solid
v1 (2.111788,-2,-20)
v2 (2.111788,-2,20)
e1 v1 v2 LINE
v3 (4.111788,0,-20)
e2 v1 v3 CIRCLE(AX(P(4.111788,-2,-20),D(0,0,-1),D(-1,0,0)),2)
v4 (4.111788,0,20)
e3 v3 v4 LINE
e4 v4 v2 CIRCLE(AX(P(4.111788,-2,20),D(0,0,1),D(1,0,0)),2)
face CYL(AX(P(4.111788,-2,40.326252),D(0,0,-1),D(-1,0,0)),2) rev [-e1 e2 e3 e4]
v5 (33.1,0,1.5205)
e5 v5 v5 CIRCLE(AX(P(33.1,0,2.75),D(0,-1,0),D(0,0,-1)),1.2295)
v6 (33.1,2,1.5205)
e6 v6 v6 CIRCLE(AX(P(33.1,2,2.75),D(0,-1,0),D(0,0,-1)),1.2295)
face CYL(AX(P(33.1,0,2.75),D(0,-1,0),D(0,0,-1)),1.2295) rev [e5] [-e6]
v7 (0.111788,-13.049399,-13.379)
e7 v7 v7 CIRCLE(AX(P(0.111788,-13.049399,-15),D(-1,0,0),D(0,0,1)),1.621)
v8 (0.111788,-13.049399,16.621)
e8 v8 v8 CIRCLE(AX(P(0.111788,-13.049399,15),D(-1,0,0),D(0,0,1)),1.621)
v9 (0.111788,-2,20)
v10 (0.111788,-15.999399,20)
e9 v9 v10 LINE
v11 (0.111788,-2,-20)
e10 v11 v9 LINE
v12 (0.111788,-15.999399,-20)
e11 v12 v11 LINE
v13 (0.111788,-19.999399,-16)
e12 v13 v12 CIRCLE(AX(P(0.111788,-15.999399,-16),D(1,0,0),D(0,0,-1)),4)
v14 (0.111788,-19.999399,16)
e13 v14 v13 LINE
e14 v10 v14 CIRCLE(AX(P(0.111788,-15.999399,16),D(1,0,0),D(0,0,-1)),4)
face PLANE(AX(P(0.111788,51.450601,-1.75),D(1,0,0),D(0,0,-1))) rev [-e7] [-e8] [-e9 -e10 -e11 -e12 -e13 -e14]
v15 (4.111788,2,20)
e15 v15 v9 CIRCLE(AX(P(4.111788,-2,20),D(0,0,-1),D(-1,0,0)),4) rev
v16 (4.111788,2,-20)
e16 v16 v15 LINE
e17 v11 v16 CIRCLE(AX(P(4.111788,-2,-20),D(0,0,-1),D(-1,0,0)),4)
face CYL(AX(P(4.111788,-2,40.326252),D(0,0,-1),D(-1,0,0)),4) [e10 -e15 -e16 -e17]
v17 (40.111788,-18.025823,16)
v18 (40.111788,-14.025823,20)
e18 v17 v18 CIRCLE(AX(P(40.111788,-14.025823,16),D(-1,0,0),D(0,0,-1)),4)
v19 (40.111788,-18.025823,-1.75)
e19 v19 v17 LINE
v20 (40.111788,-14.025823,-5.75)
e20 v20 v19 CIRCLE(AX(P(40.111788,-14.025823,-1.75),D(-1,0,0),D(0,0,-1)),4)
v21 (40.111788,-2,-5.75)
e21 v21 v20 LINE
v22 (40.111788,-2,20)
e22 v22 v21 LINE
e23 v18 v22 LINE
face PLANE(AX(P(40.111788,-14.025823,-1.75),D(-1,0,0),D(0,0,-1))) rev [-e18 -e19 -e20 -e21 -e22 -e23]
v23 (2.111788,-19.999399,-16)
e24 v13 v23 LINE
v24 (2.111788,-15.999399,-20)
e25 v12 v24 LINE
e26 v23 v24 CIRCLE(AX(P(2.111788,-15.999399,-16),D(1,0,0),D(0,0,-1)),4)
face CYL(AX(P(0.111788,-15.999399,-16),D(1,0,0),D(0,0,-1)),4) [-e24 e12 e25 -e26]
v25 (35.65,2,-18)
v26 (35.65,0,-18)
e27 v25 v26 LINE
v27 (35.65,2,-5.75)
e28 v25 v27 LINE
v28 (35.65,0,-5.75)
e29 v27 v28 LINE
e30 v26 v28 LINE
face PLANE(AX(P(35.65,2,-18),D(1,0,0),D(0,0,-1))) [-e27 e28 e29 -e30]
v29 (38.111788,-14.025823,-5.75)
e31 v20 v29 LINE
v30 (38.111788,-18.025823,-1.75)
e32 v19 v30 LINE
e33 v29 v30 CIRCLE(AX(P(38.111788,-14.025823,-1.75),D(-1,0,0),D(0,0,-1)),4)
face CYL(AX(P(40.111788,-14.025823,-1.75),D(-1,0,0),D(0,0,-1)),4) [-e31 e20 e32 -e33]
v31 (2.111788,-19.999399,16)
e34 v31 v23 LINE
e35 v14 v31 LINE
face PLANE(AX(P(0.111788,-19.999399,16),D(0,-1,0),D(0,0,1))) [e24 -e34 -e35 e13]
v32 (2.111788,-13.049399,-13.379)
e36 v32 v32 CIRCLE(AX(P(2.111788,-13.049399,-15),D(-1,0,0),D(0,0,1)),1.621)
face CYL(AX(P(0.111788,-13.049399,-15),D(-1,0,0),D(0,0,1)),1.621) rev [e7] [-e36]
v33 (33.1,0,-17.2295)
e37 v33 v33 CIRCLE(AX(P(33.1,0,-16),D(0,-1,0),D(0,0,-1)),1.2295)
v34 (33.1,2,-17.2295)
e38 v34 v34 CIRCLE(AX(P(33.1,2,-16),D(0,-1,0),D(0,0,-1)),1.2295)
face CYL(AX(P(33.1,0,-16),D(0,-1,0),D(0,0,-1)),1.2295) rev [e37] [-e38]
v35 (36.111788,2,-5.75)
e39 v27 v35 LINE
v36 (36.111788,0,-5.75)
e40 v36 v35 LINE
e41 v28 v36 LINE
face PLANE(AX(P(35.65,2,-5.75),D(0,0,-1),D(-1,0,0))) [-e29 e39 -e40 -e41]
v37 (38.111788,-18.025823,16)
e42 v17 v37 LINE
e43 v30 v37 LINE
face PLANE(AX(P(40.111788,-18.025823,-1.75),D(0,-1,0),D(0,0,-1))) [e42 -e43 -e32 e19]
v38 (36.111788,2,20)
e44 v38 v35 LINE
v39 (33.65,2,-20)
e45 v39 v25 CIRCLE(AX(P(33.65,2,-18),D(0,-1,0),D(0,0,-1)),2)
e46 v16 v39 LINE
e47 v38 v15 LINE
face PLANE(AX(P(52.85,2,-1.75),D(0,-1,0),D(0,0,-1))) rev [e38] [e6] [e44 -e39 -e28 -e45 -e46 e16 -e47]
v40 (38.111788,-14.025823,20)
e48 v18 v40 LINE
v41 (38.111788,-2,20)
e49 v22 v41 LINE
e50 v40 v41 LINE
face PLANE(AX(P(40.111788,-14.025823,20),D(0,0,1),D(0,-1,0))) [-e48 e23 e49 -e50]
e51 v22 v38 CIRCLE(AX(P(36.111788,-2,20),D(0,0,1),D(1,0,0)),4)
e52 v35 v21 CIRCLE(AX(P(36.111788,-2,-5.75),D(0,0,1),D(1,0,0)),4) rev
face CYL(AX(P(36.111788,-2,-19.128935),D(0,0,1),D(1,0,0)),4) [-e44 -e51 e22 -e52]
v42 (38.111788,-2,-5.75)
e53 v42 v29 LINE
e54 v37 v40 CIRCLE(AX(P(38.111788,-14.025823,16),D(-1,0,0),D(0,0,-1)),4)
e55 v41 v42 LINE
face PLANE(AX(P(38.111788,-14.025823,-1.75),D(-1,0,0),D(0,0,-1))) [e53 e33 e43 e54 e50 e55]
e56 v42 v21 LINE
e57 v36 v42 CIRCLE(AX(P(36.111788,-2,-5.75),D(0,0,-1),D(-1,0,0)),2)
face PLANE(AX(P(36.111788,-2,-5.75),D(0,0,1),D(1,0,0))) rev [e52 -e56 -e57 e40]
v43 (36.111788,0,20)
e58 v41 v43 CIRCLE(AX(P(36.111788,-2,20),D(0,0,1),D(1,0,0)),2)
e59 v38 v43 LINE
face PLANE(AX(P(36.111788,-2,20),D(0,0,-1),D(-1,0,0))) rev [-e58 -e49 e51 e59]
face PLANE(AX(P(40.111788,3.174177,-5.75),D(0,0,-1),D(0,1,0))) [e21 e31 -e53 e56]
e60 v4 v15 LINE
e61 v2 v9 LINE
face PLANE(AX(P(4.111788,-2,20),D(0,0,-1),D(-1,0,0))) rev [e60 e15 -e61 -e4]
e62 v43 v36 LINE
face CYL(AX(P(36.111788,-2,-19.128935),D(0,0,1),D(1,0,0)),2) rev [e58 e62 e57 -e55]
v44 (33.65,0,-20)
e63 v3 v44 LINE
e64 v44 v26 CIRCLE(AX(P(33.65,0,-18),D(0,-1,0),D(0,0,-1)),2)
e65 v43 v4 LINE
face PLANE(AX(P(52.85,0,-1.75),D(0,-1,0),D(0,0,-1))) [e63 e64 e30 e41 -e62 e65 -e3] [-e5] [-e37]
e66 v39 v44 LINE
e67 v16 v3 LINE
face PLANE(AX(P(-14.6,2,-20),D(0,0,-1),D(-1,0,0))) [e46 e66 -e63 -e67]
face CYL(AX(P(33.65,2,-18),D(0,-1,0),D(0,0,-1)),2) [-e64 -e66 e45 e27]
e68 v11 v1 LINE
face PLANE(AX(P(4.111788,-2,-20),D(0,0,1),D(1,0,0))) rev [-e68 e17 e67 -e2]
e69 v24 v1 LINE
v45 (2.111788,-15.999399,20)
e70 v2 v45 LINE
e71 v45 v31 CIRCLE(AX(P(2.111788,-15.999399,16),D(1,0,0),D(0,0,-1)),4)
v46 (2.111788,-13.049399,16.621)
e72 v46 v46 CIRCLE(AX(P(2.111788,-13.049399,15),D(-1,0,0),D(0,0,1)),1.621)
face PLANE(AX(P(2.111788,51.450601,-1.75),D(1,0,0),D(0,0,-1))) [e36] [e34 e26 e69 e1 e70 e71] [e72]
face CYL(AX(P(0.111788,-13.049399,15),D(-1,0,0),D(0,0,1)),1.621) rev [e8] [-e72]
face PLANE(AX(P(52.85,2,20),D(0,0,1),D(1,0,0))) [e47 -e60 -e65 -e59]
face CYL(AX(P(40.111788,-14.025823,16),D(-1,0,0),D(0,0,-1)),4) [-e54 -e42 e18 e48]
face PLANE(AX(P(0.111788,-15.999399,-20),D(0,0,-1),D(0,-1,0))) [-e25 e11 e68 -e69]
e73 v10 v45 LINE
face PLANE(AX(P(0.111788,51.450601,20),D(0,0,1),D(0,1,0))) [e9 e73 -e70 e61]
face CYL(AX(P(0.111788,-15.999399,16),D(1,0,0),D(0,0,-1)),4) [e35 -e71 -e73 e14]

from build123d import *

# Parameters (mm, degrees)
BOSS_EXTRUDE1_DEPTH        = 2
M2_CLEARANCE_HOLE1_D       = 2.459
M3_CLEARANCE_HOLE1_D       = 3.242
SKETCHED_START             = 39.700827994
SKETCHED_BEND1_OUTLINE_W   = 2
SKETCHED_BEND1_OUTLINE_H   = 25.75
SKETCHED_BEND1_DEPTH       = 17.149172006
SKETCHED_START_2           = 36.111787994
SKETCHED_BEND1_2_DEPTH     = 4
SKETCHED_START_3           = -5.75
SKETCHED_BEND1_3_DEPTH     = 25.75
SKETCHED_START_4           = -18.6
SKETCHED_BEND2_OUTLINE_W   = 2
SKETCHED_BEND2_OUTLINE_H   = 40
SKETCHED_BEND2_DEPTH       = 19.122747994
SKETCHED_START_5           = 0.752486697
SKETCHED_BEND2_2_OUTLINE_R = 1.621
SKETCHED_BEND2_2_DEPTH     = 1.359301297
SKETCHED_START_6           = 0.111787994
SKETCHED_BEND2_3_OUTLINE_R = 1.621
SKETCHED_BEND2_3_DEPTH     = 4
SKETCHED_START_7           = -20
SKETCHED_BEND2_4_DEPTH     = 40


with BuildPart() as part:
    # Sketch7 → Boss-Extrude1 (new body)
    with BuildSketch(Plane.XZ):
        with BuildLine():
            Line((35.65, -5.75), (52.85, -5.75))
            ThreePointArc((52.85, -5.75), (55.678427125, -4.578427125), (56.85, -1.75))
            Line((56.85, -1.75), (56.85, 16))
            ThreePointArc((56.85, 16), (55.678427125, 18.828427125), (52.85, 20))
            Line((52.85, 20), (-14.6, 20))
            ThreePointArc((-14.6, 20), (-17.428427125, 18.828427125), (-18.6, 16))
            Line((-18.6, 16), (-18.6, -16))
            ThreePointArc((-18.6, -16), (-17.428427125, -18.828427125), (-14.6, -20))
            Line((-14.6, -20), (33.65, -20))
            ThreePointArc((33.65, -20), (35.064213562, -19.414213562), (35.65, -18))
            Line((35.65, -18), (35.65, -5.75))
        make_face()
    extrude(amount=-BOSS_EXTRUDE1_DEPTH)

    # M2 Clearance Hole1 (through all)
    with Locations(Plane(origin=(0, 0, 0), x_dir=(-1, 0, 0), z_dir=(0, -1, 0))):
        with Locations((-33.1, 16), (-33.1, -2.75)):
            Hole(M2_CLEARANCE_HOLE1_D / 2)

    # M3 Clearance Hole1 (through all)
    with Locations(Plane(origin=(0, 2, 0), x_dir=(1, 0, 0), z_dir=(0, 1, 0))):
        with Locations((-11.65, -15), (-11.65, 15)):
            Hole(M3_CLEARANCE_HOLE1_D / 2)

    # Sketched Bend1: read off the stored shape, not the designer's step
    # Sketched Bend1 outline → Sketched Bend1 (cut)
    with BuildSketch(Plane.YZ.offset(SKETCHED_START)):
        with Locations((1, 7.125)):
            Rectangle(SKETCHED_BEND1_OUTLINE_W, SKETCHED_BEND1_OUTLINE_H)
    extrude(amount=SKETCHED_BEND1_DEPTH, mode=Mode.SUBTRACT)

    # Sketched Bend1 2 outline → Sketched Bend1 2 (add)
    with BuildSketch(Plane.YZ.offset(SKETCHED_START_2)):
        with BuildLine():
            Line((0, 20), (-14.025823026, 20))
            ThreePointArc((-14.025823026, 20), (-16.854250151, 18.828427124), (-18.025823026, 16))
            Line((-18.025823026, 16), (-18.025823026, -1.75))
            ThreePointArc((-18.025823026, -1.75), (-16.854250151, -4.578427124), (-14.025823026, -5.75))
            Line((-14.025823026, -5.75), (0, -5.75))
            Line((0, -5.75), (0, 20))
        make_face()
    extrude(amount=SKETCHED_BEND1_2_DEPTH)

    # Sketched Bend1 3 outline → Sketched Bend1 3 (cut)
    with BuildSketch(Plane.XY.offset(SKETCHED_START_3)):
        with BuildLine():
            ThreePointArc((36.111787994, 2), (38.940215119, 0.828427125), (40.111787994, -2))
            Line((40.111787994, -2), (40.111787994, 0))
            Line((40.111787994, 0), (39.700827994, 0))
            Line((39.700827994, 0), (39.700827994, 2))
            Line((39.700827994, 2), (36.111787994, 2))
        make_face()
        with BuildLine():
            Line((38.111787994, -18.025823026), (38.111787994, -2))
            ThreePointArc((38.111787994, -2), (37.526001556, -0.585786438), (36.111787994, 0))
            Line((36.111787994, 0), (36.111787994, -18.025823026))
            Line((36.111787994, -18.025823026), (38.111787994, -18.025823026))
        make_face()
    extrude(amount=SKETCHED_BEND1_3_DEPTH, mode=Mode.SUBTRACT)

    # Sketched Bend2: read off the stored shape, not the designer's step
    # Sketched Bend2 outline → Sketched Bend2 (cut)
    with BuildSketch(Plane.YZ.offset(SKETCHED_START_4)):
        with Locations((1, 0)):
            Rectangle(SKETCHED_BEND2_OUTLINE_W, SKETCHED_BEND2_OUTLINE_H)
    extrude(amount=SKETCHED_BEND2_DEPTH, mode=Mode.SUBTRACT)

    # Sketched Bend2 2 outline → Sketched Bend2 2 (add)
    with BuildSketch(Plane.YZ.offset(SKETCHED_START_5)):
        with BuildLine():
            Line((0, 20), (-15.999399014, 20))
            ThreePointArc((-15.999399014, 20), (-18.827826139, 18.828427125), (-19.999399014, 16))
            Line((-19.999399014, 16), (-19.999399014, -16))
            ThreePointArc((-19.999399014, -16), (-18.827826139, -18.828427124), (-15.999399014, -20))
            Line((-15.999399014, -20), (0, -20))
            Line((0, -20), (0, 20))
        make_face()
        with Locations((-13.049399014, -15)):
            Circle(SKETCHED_BEND2_2_OUTLINE_R, mode=Mode.SUBTRACT)
        with Locations((-13.049399014, 15)):
            Circle(SKETCHED_BEND2_2_OUTLINE_R, mode=Mode.SUBTRACT)
    extrude(amount=SKETCHED_BEND2_2_DEPTH)

    # Sketched Bend2 3 outline → Sketched Bend2 3 (add)
    with BuildSketch(Plane.YZ.offset(SKETCHED_START_6)):
        with BuildLine():
            Line((0, 20), (-15.999399014, 20))
            ThreePointArc((-15.999399014, 20), (-18.827826139, 18.828427125), (-19.999399014, 16))
            Line((-19.999399014, 16), (-19.999399014, -16))
            ThreePointArc((-19.999399014, -16), (-18.827826139, -18.828427124), (-15.999399014, -20))
            Line((-15.999399014, -20), (0, -20))
            Line((0, -20), (0, 20))
        make_face()
        with Locations((-13.049399014, -15)):
            Circle(SKETCHED_BEND2_3_OUTLINE_R, mode=Mode.SUBTRACT)
        with Locations((-13.049399014, 15)):
            Circle(SKETCHED_BEND2_3_OUTLINE_R, mode=Mode.SUBTRACT)
    extrude(amount=SKETCHED_BEND2_3_DEPTH)

    # Sketched Bend2 4 outline → Sketched Bend2 4 (cut)
    with BuildSketch(Plane.XY.offset(SKETCHED_START_7)):
        with BuildLine():
            Line((0.111787994, 0), (0.111787994, -2))
            ThreePointArc((0.111787994, -2), (1.283360869, 0.828427125), (4.111787994, 2))
            Line((4.111787994, 2), (0.522747994, 2))
            Line((0.522747994, 2), (0.522747994, 0))
            Line((0.522747994, 0), (0.111787994, 0))
        make_face()
        with BuildLine():
            ThreePointArc((4.111787994, 0), (2.697574432, -0.585786438), (2.111787994, -2))
            Line((2.111787994, -2), (2.111787994, -19.999399014))
            Line((2.111787994, -19.999399014), (4.111787994, -19.999399014))
            Line((4.111787994, -19.999399014), (4.111787994, 0))
        make_face()
    extrude(amount=SKETCHED_BEND2_4_DEPTH, mode=Mode.SUBTRACT)


solid = part.part
